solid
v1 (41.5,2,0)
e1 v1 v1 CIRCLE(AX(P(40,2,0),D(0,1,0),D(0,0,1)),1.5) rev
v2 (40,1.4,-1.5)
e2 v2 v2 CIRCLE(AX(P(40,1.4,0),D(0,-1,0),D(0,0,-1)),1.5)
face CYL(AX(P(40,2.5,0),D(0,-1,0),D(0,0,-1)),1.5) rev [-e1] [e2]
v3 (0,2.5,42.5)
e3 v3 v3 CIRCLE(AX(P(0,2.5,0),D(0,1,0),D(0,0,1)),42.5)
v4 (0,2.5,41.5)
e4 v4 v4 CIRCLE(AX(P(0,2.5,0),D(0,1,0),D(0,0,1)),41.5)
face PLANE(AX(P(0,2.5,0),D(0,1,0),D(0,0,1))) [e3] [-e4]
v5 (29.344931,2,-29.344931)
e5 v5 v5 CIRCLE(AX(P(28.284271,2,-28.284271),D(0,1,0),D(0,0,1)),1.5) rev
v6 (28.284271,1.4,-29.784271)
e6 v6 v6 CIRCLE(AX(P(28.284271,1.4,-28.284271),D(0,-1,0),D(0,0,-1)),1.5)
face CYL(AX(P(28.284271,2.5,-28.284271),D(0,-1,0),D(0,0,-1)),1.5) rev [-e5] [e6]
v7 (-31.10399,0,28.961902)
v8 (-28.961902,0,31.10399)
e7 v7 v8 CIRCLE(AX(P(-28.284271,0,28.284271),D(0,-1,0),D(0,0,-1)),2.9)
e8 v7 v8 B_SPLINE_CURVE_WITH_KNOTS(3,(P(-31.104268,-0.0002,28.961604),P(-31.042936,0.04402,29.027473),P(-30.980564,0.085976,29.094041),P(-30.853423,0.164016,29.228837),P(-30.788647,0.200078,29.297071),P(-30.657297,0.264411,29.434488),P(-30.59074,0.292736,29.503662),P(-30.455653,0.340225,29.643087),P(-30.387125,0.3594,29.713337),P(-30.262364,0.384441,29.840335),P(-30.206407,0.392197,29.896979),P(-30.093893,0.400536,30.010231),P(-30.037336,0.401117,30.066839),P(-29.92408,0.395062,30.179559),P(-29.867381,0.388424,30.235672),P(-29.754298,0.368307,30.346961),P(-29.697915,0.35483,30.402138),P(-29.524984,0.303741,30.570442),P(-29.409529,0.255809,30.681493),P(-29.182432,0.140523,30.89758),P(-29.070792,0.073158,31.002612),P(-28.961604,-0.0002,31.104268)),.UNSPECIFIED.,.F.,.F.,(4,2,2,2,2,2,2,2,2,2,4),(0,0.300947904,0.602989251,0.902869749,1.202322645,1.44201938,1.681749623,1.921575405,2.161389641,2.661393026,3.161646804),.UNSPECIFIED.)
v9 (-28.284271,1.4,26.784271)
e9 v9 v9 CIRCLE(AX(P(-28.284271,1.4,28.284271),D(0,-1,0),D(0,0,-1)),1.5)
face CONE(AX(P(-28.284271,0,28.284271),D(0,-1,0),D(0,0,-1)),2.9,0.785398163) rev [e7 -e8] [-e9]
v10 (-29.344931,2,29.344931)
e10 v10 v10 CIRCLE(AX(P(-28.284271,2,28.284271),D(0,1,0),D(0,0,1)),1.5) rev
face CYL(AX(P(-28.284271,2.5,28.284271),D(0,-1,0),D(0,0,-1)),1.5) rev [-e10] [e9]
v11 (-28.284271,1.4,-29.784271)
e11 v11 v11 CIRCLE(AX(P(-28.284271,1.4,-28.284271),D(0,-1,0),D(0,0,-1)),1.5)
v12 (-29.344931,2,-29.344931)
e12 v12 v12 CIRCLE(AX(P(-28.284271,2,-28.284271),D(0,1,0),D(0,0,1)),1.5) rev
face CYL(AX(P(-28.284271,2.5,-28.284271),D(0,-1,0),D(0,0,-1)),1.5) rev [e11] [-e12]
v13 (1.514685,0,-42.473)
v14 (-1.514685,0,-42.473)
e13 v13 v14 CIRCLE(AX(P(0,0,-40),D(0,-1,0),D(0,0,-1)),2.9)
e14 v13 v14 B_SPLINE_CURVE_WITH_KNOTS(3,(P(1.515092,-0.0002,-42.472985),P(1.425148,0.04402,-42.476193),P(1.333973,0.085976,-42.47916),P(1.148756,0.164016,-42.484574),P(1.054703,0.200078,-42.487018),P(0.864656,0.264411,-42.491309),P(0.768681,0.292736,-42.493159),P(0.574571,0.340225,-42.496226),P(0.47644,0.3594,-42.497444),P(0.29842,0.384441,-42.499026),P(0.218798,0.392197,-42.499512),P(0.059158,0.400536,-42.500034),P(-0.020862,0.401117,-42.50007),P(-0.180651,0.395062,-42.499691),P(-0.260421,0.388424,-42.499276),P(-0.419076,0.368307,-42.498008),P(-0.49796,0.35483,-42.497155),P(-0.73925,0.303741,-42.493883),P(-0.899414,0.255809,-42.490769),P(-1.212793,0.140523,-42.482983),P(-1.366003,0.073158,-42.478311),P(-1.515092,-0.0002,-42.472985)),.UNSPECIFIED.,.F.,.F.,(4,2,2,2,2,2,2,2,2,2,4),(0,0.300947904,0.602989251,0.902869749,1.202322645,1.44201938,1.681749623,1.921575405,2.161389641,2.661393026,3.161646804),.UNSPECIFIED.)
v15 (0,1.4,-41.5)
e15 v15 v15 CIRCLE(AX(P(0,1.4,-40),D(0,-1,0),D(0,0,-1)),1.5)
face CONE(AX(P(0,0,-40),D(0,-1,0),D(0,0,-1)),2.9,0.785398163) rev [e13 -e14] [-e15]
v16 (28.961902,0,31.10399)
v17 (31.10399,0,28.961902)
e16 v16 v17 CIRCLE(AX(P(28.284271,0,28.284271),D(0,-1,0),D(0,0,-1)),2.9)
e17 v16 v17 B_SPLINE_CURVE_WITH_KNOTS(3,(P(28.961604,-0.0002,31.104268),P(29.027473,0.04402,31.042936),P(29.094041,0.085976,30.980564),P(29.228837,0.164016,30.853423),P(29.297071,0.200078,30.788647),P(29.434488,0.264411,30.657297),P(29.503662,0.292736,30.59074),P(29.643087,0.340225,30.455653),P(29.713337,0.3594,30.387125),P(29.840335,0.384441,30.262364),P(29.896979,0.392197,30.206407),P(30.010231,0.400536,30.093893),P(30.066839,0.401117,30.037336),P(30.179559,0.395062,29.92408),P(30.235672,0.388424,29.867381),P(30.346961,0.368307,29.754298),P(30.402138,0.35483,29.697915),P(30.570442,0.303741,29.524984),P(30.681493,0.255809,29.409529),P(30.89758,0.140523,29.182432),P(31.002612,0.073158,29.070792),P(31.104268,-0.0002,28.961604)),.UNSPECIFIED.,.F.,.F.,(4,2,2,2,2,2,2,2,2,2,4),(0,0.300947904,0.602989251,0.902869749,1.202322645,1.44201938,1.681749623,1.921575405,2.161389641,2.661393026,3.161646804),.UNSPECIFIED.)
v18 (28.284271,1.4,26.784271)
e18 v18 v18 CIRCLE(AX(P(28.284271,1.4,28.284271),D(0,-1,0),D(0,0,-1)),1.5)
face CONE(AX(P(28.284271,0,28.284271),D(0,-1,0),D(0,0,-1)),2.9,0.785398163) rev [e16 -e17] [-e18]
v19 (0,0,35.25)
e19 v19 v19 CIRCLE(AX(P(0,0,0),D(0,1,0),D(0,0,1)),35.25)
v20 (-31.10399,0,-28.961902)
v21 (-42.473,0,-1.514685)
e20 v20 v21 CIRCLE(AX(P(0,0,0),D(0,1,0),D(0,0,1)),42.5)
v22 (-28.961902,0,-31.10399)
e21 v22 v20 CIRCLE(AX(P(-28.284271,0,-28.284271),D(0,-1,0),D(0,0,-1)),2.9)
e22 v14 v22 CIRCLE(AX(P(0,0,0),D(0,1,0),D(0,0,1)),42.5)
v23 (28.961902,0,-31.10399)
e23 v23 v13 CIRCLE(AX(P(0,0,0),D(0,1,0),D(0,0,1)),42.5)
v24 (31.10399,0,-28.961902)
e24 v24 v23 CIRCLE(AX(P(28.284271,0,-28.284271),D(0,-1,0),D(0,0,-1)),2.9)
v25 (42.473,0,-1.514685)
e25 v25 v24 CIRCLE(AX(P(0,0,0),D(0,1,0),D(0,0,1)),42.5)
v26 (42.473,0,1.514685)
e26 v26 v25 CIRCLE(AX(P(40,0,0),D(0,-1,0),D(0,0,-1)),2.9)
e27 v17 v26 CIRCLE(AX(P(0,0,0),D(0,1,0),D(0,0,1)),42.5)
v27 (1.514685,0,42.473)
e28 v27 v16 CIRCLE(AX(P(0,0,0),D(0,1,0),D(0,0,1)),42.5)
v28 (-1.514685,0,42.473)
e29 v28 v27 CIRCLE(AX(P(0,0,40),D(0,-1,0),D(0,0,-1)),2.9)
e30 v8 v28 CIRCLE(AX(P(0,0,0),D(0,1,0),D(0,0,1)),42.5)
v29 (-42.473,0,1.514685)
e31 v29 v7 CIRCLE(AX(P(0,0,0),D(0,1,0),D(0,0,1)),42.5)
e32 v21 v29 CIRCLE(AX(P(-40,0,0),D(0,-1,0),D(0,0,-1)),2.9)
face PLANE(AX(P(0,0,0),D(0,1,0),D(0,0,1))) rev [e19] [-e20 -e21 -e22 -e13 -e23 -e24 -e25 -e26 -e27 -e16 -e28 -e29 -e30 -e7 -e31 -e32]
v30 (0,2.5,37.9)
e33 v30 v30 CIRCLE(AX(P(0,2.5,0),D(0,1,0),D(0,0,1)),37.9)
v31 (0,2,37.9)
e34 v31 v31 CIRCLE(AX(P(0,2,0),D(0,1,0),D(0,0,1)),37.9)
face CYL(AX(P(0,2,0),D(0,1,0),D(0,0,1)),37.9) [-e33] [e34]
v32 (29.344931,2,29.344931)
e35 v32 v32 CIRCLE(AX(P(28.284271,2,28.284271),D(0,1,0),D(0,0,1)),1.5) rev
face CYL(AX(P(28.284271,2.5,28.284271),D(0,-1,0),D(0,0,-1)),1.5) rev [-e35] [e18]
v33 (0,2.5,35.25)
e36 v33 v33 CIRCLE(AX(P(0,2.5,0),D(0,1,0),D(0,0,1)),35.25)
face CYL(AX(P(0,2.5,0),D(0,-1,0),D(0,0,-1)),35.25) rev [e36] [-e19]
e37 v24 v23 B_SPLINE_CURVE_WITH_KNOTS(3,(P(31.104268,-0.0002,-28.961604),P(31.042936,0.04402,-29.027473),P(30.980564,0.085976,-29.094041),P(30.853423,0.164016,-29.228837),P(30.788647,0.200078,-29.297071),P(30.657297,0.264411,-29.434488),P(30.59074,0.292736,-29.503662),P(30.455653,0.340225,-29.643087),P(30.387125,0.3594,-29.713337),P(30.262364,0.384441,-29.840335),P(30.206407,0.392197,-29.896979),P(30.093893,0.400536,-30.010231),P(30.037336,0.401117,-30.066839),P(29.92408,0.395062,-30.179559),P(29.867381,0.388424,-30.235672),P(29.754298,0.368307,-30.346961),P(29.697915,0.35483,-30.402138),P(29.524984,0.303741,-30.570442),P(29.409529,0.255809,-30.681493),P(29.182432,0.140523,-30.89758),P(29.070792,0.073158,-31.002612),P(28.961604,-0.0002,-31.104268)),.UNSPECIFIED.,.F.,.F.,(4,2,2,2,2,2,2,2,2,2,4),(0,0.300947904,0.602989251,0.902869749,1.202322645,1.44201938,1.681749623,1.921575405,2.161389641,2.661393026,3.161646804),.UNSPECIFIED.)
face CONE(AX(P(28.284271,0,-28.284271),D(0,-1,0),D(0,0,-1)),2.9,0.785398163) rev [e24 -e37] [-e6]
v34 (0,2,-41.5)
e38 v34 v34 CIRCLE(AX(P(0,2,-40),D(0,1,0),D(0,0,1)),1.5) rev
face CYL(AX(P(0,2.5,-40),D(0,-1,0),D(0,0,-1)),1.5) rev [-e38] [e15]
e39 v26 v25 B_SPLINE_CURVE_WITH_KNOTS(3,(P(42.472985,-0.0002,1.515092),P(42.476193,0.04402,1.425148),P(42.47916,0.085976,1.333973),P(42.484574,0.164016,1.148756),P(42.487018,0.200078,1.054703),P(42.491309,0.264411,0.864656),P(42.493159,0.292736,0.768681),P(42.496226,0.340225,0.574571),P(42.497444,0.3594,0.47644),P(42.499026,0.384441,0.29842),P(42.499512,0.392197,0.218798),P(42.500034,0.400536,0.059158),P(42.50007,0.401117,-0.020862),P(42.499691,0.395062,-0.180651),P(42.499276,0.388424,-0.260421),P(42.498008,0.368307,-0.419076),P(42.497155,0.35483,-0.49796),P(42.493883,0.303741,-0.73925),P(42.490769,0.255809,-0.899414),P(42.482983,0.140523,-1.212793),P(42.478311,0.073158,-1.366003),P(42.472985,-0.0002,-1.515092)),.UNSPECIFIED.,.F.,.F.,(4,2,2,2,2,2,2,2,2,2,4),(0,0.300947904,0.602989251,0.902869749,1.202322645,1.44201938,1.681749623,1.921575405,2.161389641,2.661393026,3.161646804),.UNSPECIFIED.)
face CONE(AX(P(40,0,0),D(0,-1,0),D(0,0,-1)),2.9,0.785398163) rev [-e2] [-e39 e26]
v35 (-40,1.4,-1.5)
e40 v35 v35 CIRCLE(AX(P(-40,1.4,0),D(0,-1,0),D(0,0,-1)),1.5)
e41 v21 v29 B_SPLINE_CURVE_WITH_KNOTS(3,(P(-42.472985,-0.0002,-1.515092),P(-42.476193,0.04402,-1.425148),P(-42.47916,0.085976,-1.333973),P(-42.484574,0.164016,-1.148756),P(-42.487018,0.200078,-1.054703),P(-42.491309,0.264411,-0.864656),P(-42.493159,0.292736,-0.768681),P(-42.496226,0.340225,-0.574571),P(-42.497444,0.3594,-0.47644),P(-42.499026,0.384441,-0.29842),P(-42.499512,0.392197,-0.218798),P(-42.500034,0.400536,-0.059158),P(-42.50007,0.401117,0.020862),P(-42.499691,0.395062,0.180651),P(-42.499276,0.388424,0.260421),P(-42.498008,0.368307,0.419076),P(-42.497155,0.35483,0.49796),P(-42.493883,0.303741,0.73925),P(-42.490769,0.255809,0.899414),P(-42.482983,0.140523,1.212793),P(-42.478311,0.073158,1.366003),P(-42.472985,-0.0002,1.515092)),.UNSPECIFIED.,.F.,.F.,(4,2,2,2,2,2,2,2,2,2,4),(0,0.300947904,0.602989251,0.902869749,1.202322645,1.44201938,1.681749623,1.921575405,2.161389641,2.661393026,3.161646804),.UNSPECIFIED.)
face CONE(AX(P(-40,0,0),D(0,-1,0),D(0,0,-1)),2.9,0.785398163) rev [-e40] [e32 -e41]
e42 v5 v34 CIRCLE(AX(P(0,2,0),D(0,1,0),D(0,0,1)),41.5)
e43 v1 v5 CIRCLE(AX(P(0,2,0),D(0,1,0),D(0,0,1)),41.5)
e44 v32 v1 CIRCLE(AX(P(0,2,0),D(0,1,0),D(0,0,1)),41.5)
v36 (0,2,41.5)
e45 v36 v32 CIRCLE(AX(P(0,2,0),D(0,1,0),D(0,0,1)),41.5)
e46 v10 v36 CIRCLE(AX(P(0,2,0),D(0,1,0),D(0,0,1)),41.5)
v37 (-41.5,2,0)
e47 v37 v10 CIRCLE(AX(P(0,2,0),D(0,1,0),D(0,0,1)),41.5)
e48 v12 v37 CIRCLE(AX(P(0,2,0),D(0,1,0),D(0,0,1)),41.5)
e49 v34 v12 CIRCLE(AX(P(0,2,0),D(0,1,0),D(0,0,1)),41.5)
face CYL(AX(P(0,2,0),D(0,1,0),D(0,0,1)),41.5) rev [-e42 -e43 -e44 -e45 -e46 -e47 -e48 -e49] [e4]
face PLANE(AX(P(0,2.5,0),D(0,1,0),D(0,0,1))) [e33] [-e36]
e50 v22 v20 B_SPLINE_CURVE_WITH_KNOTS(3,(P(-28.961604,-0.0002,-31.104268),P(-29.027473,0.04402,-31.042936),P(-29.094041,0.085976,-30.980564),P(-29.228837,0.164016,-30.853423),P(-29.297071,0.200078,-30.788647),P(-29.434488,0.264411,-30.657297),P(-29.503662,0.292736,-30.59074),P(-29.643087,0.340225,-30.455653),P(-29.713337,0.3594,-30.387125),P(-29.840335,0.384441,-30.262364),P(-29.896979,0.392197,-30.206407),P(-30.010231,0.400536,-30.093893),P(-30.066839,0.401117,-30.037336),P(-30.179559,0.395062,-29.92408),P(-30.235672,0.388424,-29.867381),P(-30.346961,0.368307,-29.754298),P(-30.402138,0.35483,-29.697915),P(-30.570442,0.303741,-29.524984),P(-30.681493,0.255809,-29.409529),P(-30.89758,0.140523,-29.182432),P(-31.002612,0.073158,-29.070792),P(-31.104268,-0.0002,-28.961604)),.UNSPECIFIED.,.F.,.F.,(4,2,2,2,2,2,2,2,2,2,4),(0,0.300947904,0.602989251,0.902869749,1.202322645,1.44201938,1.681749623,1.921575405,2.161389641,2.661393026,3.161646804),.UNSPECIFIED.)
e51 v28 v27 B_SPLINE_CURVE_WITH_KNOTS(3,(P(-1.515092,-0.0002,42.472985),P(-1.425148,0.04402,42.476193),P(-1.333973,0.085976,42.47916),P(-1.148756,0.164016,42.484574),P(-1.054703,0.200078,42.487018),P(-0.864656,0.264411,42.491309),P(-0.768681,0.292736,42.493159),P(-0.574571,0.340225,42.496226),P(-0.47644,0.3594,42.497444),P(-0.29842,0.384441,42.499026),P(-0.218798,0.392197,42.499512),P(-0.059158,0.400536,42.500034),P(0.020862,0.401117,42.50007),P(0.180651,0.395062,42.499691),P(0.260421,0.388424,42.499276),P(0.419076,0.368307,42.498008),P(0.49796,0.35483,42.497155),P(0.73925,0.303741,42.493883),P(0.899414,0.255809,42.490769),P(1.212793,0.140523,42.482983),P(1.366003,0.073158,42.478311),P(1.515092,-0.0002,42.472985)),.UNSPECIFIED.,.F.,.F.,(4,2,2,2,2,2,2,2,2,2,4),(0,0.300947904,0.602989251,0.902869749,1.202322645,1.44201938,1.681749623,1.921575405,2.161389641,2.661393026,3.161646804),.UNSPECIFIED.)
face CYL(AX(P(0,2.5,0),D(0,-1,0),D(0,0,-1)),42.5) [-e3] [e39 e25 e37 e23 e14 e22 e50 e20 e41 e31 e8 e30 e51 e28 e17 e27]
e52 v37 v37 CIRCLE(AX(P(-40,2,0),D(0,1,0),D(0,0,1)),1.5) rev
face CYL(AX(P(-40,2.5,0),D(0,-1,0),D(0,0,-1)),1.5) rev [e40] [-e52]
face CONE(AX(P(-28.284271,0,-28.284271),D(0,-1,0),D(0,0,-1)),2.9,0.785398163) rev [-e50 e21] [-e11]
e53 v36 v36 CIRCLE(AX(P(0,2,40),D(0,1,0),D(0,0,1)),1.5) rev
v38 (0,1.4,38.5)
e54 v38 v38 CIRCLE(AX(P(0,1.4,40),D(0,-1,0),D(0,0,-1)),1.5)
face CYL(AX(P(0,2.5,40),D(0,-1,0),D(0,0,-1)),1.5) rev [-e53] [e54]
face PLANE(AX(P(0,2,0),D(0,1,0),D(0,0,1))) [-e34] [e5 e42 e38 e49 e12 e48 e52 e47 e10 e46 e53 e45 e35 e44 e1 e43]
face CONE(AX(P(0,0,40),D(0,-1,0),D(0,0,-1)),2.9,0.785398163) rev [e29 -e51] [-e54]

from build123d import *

# Parameters (mm, degrees)
SKETCH_1_R          = 42.5
SKETCH_1_R_2        = 35.25
EXTRUDE_1_DEPTH     = 2.5
SKETCH_2_R          = 1.5
CUT_EXTRUDE_1_DEPTH = 61.156047078
SKETCH_3_R          = 41.5
SKETCH_3_R_2        = 37.9
CUT_EXTRUDE_2_DEPTH = 0.5


with BuildPart() as part:
    # 草图1 → 凸台-拉伸1 (new body)
    with BuildSketch(Plane(origin=(0, 0, 0), x_dir=(1, 0, 0), z_dir=(0, 1, 0))):
        with Locations(Location((0, 0, 0), (0, 0, 270))):
            Circle(SKETCH_1_R)
        with Locations(Location((0, 0, 0), (0, 0, 270))):
            Circle(SKETCH_1_R_2, mode=Mode.SUBTRACT)
    extrude(amount=EXTRUDE_1_DEPTH)

    # 草图2 → 切除-拉伸1 (cut, through all)
    with BuildSketch(Plane.XZ):
        with Locations(Location((0, 40, 0), (0, 0, 270))):
            Circle(SKETCH_2_R)
        with Locations(Location((28.284271247, 28.284271247, 0), (0, 0, 270))):
            Circle(SKETCH_2_R)
        with Locations(Location((40, 0, 0), (0, 0, 270))):
            Circle(SKETCH_2_R)
        with Locations(Location((28.284271247, -28.284271247, 0), (0, 0, 270))):
            Circle(SKETCH_2_R)
        with Locations(Location((0, -40, 0), (0, 0, 270))):
            Circle(SKETCH_2_R)
        with Locations(Location((-28.284271247, -28.284271247, 0), (0, 0, 270))):
            Circle(SKETCH_2_R)
        with Locations(Location((-40, 0, 0), (0, 0, 270))):
            Circle(SKETCH_2_R)
        with Locations(Location((-28.284271247, 28.284271247, 0), (0, 0, 270))):
            Circle(SKETCH_2_R)
    extrude(amount=-CUT_EXTRUDE_1_DEPTH, mode=Mode.SUBTRACT)

    # 草图3 → 切除-拉伸2 (cut)
    with BuildSketch(Plane(origin=(0, 2.5, 0), x_dir=(1, 0, 0), z_dir=(0, 1, 0))):
        with Locations(Location((0, 0, 0), (0, 0, 270))):
            Circle(SKETCH_3_R)
        with Locations(Location((0, 0, 0), (0, 0, 270))):
            Circle(SKETCH_3_R_2, mode=Mode.SUBTRACT)
    extrude(amount=-CUT_EXTRUDE_2_DEPTH, mode=Mode.SUBTRACT)

    # 打孔尺寸(%根据十字)槽沉头木螺钉的类型1: read off the stored shape, not the designer's step
    # 打孔尺寸(%根据十字)槽沉头木螺钉的类型1: loft between two sections, ruled curve by curve
    hole_wizard_1_from = [
        Edge.make_three_point_arc((-40, 1.4, -1.5), (-38.5, 1.4, 0), (-40, 1.4, 1.5)),
        Edge.make_three_point_arc((-40, 1.4, 1.5), (-41.5, 1.4, 0), (-40, 1.4, -1.5)),
    ]
    hole_wizard_1_to = [
        Edge.make_three_point_arc((-40, -4.3e-08, -2.900000043), (-37.099999957, -4.3e-08, 0), (-40, -4.3e-08, 2.900000043)),
        Edge.make_three_point_arc((-40, -4.3e-08, 2.900000043), (-42.900000043, -4.3e-08, 0), (-40, -4.3e-08, -2.900000043)),
    ]
    hole_wizard_1 = Solid(Shell([*[Face.make_surface_from_curves(hole_wizard_1_from[k], hole_wizard_1_to[k]) for k in range(2)], Face(Wire(hole_wizard_1_from)), Face(Wire(hole_wizard_1_to))]))
    add(hole_wizard_1, mode=Mode.SUBTRACT)

    # Hole Wizard 1 2: loft between two sections, ruled curve by curve
    hole_wizard_1_2_from = [
        Edge.make_three_point_arc((-28.284271247, 1.4, -29.784271247), (-26.784271247, 1.4, -28.284271247), (-28.284271247, 1.4, -26.784271247)),
        Edge.make_three_point_arc((-28.284271247, 1.4, -26.784271247), (-29.784271247, 1.4, -28.284271247), (-28.284271247, 1.4, -29.784271247)),
    ]
    hole_wizard_1_2_to = [
        Edge.make_three_point_arc((-28.284271247, -4.3e-08, -31.18427129), (-25.384271205, -4.3e-08, -28.284271247), (-28.284271247, -4.3e-08, -25.384271205)),
        Edge.make_three_point_arc((-28.284271247, -4.3e-08, -25.384271205), (-31.18427129, -4.3e-08, -28.284271247), (-28.284271247, -4.3e-08, -31.18427129)),
    ]
    hole_wizard_1_2 = Solid(Shell([*[Face.make_surface_from_curves(hole_wizard_1_2_from[k], hole_wizard_1_2_to[k]) for k in range(2)], Face(Wire(hole_wizard_1_2_from)), Face(Wire(hole_wizard_1_2_to))]))
    add(hole_wizard_1_2, mode=Mode.SUBTRACT)

    # Hole Wizard 1 3: loft between two sections, ruled curve by curve
    hole_wizard_1_3_from = [
        Edge.make_three_point_arc((0, 1.4, -41.5), (1.5, 1.4, -40), (0, 1.4, -38.5)),
        Edge.make_three_point_arc((0, 1.4, -38.5), (-1.5, 1.4, -40), (0, 1.4, -41.5)),
    ]
    hole_wizard_1_3_to = [
        Edge.make_three_point_arc((0, -4.3e-08, -42.900000043), (2.900000043, -4.3e-08, -40), (0, -4.3e-08, -37.099999957)),
        Edge.make_three_point_arc((0, -4.3e-08, -37.099999957), (-2.900000043, -4.3e-08, -40), (0, -4.3e-08, -42.900000043)),
    ]
    hole_wizard_1_3 = Solid(Shell([*[Face.make_surface_from_curves(hole_wizard_1_3_from[k], hole_wizard_1_3_to[k]) for k in range(2)], Face(Wire(hole_wizard_1_3_from)), Face(Wire(hole_wizard_1_3_to))]))
    add(hole_wizard_1_3, mode=Mode.SUBTRACT)

    # Hole Wizard 1 4: loft between two sections, ruled curve by curve
    hole_wizard_1_4_from = [
        Edge.make_three_point_arc((28.284271247, 1.4, -29.784271247), (29.784271247, 1.4, -28.284271247), (28.284271247, 1.4, -26.784271247)),
        Edge.make_three_point_arc((28.284271247, 1.4, -26.784271247), (26.784271247, 1.4, -28.284271247), (28.284271247, 1.4, -29.784271247)),
    ]
    hole_wizard_1_4_to = [
        Edge.make_three_point_arc((28.284271247, -4.3e-08, -31.18427129), (31.18427129, -4.3e-08, -28.284271247), (28.284271247, -4.3e-08, -25.384271205)),
        Edge.make_three_point_arc((28.284271247, -4.3e-08, -25.384271205), (25.384271205, -4.3e-08, -28.284271247), (28.284271247, -4.3e-08, -31.18427129)),
    ]
    hole_wizard_1_4 = Solid(Shell([*[Face.make_surface_from_curves(hole_wizard_1_4_from[k], hole_wizard_1_4_to[k]) for k in range(2)], Face(Wire(hole_wizard_1_4_from)), Face(Wire(hole_wizard_1_4_to))]))
    add(hole_wizard_1_4, mode=Mode.SUBTRACT)

    # Hole Wizard 1 5: loft between two sections, ruled curve by curve
    hole_wizard_1_5_from = [
        Edge.make_three_point_arc((40, 1.4, -1.5), (41.5, 1.4, 0), (40, 1.4, 1.5)),
        Edge.make_three_point_arc((40, 1.4, 1.5), (38.5, 1.4, 0), (40, 1.4, -1.5)),
    ]
    hole_wizard_1_5_to = [
        Edge.make_three_point_arc((40, -4.3e-08, -2.900000043), (42.900000043, -4.3e-08, 0), (40, -4.3e-08, 2.900000043)),
        Edge.make_three_point_arc((40, -4.3e-08, 2.900000043), (37.099999957, -4.3e-08, 0), (40, -4.3e-08, -2.900000043)),
    ]
    hole_wizard_1_5 = Solid(Shell([*[Face.make_surface_from_curves(hole_wizard_1_5_from[k], hole_wizard_1_5_to[k]) for k in range(2)], Face(Wire(hole_wizard_1_5_from)), Face(Wire(hole_wizard_1_5_to))]))
    add(hole_wizard_1_5, mode=Mode.SUBTRACT)

    # Hole Wizard 1 6: loft between two sections, ruled curve by curve
    hole_wizard_1_6_from = [
        Edge.make_three_point_arc((28.284271247, 1.4, 26.784271247), (29.784271247, 1.4, 28.284271247), (28.284271247, 1.4, 29.784271247)),
        Edge.make_three_point_arc((28.284271247, 1.4, 29.784271247), (26.784271247, 1.4, 28.284271247), (28.284271247, 1.4, 26.784271247)),
    ]
    hole_wizard_1_6_to = [
        Edge.make_three_point_arc((28.284271247, -4.3e-08, 25.384271205), (31.18427129, -4.3e-08, 28.284271247), (28.284271247, -4.3e-08, 31.18427129)),
        Edge.make_three_point_arc((28.284271247, -4.3e-08, 31.18427129), (25.384271205, -4.3e-08, 28.284271247), (28.284271247, -4.3e-08, 25.384271205)),
    ]
    hole_wizard_1_6 = Solid(Shell([*[Face.make_surface_from_curves(hole_wizard_1_6_from[k], hole_wizard_1_6_to[k]) for k in range(2)], Face(Wire(hole_wizard_1_6_from)), Face(Wire(hole_wizard_1_6_to))]))
    add(hole_wizard_1_6, mode=Mode.SUBTRACT)

    # Hole Wizard 1 7: loft between two sections, ruled curve by curve
    hole_wizard_1_7_from = [
        Edge.make_three_point_arc((0, 1.4, 38.5), (1.5, 1.4, 40), (0, 1.4, 41.5)),
        Edge.make_three_point_arc((0, 1.4, 41.5), (-1.5, 1.4, 40), (0, 1.4, 38.5)),
    ]
    hole_wizard_1_7_to = [
        Edge.make_three_point_arc((0, -4.3e-08, 37.099999957), (2.900000043, -4.3e-08, 40), (0, -4.3e-08, 42.900000043)),
        Edge.make_three_point_arc((0, -4.3e-08, 42.900000043), (-2.900000043, -4.3e-08, 40), (0, -4.3e-08, 37.099999957)),
    ]
    hole_wizard_1_7 = Solid(Shell([*[Face.make_surface_from_curves(hole_wizard_1_7_from[k], hole_wizard_1_7_to[k]) for k in range(2)], Face(Wire(hole_wizard_1_7_from)), Face(Wire(hole_wizard_1_7_to))]))
    add(hole_wizard_1_7, mode=Mode.SUBTRACT)

    # Hole Wizard 1 8: loft between two sections, ruled curve by curve
    hole_wizard_1_8_from = [
        Edge.make_three_point_arc((-28.284271247, 1.4, 26.784271247), (-26.784271247, 1.4, 28.284271247), (-28.284271247, 1.4, 29.784271247)),
        Edge.make_three_point_arc((-28.284271247, 1.4, 29.784271247), (-29.784271247, 1.4, 28.284271247), (-28.284271247, 1.4, 26.784271247)),
    ]
    hole_wizard_1_8_to = [
        Edge.make_three_point_arc((-28.284271247, -4.3e-08, 25.384271205), (-25.384271205, -4.3e-08, 28.284271247), (-28.284271247, -4.3e-08, 31.18427129)),
        Edge.make_three_point_arc((-28.284271247, -4.3e-08, 31.18427129), (-31.18427129, -4.3e-08, 28.284271247), (-28.284271247, -4.3e-08, 25.384271205)),
    ]
    hole_wizard_1_8 = Solid(Shell([*[Face.make_surface_from_curves(hole_wizard_1_8_from[k], hole_wizard_1_8_to[k]) for k in range(2)], Face(Wire(hole_wizard_1_8_from)), Face(Wire(hole_wizard_1_8_to))]))
    add(hole_wizard_1_8, mode=Mode.SUBTRACT)


solid = part.part
